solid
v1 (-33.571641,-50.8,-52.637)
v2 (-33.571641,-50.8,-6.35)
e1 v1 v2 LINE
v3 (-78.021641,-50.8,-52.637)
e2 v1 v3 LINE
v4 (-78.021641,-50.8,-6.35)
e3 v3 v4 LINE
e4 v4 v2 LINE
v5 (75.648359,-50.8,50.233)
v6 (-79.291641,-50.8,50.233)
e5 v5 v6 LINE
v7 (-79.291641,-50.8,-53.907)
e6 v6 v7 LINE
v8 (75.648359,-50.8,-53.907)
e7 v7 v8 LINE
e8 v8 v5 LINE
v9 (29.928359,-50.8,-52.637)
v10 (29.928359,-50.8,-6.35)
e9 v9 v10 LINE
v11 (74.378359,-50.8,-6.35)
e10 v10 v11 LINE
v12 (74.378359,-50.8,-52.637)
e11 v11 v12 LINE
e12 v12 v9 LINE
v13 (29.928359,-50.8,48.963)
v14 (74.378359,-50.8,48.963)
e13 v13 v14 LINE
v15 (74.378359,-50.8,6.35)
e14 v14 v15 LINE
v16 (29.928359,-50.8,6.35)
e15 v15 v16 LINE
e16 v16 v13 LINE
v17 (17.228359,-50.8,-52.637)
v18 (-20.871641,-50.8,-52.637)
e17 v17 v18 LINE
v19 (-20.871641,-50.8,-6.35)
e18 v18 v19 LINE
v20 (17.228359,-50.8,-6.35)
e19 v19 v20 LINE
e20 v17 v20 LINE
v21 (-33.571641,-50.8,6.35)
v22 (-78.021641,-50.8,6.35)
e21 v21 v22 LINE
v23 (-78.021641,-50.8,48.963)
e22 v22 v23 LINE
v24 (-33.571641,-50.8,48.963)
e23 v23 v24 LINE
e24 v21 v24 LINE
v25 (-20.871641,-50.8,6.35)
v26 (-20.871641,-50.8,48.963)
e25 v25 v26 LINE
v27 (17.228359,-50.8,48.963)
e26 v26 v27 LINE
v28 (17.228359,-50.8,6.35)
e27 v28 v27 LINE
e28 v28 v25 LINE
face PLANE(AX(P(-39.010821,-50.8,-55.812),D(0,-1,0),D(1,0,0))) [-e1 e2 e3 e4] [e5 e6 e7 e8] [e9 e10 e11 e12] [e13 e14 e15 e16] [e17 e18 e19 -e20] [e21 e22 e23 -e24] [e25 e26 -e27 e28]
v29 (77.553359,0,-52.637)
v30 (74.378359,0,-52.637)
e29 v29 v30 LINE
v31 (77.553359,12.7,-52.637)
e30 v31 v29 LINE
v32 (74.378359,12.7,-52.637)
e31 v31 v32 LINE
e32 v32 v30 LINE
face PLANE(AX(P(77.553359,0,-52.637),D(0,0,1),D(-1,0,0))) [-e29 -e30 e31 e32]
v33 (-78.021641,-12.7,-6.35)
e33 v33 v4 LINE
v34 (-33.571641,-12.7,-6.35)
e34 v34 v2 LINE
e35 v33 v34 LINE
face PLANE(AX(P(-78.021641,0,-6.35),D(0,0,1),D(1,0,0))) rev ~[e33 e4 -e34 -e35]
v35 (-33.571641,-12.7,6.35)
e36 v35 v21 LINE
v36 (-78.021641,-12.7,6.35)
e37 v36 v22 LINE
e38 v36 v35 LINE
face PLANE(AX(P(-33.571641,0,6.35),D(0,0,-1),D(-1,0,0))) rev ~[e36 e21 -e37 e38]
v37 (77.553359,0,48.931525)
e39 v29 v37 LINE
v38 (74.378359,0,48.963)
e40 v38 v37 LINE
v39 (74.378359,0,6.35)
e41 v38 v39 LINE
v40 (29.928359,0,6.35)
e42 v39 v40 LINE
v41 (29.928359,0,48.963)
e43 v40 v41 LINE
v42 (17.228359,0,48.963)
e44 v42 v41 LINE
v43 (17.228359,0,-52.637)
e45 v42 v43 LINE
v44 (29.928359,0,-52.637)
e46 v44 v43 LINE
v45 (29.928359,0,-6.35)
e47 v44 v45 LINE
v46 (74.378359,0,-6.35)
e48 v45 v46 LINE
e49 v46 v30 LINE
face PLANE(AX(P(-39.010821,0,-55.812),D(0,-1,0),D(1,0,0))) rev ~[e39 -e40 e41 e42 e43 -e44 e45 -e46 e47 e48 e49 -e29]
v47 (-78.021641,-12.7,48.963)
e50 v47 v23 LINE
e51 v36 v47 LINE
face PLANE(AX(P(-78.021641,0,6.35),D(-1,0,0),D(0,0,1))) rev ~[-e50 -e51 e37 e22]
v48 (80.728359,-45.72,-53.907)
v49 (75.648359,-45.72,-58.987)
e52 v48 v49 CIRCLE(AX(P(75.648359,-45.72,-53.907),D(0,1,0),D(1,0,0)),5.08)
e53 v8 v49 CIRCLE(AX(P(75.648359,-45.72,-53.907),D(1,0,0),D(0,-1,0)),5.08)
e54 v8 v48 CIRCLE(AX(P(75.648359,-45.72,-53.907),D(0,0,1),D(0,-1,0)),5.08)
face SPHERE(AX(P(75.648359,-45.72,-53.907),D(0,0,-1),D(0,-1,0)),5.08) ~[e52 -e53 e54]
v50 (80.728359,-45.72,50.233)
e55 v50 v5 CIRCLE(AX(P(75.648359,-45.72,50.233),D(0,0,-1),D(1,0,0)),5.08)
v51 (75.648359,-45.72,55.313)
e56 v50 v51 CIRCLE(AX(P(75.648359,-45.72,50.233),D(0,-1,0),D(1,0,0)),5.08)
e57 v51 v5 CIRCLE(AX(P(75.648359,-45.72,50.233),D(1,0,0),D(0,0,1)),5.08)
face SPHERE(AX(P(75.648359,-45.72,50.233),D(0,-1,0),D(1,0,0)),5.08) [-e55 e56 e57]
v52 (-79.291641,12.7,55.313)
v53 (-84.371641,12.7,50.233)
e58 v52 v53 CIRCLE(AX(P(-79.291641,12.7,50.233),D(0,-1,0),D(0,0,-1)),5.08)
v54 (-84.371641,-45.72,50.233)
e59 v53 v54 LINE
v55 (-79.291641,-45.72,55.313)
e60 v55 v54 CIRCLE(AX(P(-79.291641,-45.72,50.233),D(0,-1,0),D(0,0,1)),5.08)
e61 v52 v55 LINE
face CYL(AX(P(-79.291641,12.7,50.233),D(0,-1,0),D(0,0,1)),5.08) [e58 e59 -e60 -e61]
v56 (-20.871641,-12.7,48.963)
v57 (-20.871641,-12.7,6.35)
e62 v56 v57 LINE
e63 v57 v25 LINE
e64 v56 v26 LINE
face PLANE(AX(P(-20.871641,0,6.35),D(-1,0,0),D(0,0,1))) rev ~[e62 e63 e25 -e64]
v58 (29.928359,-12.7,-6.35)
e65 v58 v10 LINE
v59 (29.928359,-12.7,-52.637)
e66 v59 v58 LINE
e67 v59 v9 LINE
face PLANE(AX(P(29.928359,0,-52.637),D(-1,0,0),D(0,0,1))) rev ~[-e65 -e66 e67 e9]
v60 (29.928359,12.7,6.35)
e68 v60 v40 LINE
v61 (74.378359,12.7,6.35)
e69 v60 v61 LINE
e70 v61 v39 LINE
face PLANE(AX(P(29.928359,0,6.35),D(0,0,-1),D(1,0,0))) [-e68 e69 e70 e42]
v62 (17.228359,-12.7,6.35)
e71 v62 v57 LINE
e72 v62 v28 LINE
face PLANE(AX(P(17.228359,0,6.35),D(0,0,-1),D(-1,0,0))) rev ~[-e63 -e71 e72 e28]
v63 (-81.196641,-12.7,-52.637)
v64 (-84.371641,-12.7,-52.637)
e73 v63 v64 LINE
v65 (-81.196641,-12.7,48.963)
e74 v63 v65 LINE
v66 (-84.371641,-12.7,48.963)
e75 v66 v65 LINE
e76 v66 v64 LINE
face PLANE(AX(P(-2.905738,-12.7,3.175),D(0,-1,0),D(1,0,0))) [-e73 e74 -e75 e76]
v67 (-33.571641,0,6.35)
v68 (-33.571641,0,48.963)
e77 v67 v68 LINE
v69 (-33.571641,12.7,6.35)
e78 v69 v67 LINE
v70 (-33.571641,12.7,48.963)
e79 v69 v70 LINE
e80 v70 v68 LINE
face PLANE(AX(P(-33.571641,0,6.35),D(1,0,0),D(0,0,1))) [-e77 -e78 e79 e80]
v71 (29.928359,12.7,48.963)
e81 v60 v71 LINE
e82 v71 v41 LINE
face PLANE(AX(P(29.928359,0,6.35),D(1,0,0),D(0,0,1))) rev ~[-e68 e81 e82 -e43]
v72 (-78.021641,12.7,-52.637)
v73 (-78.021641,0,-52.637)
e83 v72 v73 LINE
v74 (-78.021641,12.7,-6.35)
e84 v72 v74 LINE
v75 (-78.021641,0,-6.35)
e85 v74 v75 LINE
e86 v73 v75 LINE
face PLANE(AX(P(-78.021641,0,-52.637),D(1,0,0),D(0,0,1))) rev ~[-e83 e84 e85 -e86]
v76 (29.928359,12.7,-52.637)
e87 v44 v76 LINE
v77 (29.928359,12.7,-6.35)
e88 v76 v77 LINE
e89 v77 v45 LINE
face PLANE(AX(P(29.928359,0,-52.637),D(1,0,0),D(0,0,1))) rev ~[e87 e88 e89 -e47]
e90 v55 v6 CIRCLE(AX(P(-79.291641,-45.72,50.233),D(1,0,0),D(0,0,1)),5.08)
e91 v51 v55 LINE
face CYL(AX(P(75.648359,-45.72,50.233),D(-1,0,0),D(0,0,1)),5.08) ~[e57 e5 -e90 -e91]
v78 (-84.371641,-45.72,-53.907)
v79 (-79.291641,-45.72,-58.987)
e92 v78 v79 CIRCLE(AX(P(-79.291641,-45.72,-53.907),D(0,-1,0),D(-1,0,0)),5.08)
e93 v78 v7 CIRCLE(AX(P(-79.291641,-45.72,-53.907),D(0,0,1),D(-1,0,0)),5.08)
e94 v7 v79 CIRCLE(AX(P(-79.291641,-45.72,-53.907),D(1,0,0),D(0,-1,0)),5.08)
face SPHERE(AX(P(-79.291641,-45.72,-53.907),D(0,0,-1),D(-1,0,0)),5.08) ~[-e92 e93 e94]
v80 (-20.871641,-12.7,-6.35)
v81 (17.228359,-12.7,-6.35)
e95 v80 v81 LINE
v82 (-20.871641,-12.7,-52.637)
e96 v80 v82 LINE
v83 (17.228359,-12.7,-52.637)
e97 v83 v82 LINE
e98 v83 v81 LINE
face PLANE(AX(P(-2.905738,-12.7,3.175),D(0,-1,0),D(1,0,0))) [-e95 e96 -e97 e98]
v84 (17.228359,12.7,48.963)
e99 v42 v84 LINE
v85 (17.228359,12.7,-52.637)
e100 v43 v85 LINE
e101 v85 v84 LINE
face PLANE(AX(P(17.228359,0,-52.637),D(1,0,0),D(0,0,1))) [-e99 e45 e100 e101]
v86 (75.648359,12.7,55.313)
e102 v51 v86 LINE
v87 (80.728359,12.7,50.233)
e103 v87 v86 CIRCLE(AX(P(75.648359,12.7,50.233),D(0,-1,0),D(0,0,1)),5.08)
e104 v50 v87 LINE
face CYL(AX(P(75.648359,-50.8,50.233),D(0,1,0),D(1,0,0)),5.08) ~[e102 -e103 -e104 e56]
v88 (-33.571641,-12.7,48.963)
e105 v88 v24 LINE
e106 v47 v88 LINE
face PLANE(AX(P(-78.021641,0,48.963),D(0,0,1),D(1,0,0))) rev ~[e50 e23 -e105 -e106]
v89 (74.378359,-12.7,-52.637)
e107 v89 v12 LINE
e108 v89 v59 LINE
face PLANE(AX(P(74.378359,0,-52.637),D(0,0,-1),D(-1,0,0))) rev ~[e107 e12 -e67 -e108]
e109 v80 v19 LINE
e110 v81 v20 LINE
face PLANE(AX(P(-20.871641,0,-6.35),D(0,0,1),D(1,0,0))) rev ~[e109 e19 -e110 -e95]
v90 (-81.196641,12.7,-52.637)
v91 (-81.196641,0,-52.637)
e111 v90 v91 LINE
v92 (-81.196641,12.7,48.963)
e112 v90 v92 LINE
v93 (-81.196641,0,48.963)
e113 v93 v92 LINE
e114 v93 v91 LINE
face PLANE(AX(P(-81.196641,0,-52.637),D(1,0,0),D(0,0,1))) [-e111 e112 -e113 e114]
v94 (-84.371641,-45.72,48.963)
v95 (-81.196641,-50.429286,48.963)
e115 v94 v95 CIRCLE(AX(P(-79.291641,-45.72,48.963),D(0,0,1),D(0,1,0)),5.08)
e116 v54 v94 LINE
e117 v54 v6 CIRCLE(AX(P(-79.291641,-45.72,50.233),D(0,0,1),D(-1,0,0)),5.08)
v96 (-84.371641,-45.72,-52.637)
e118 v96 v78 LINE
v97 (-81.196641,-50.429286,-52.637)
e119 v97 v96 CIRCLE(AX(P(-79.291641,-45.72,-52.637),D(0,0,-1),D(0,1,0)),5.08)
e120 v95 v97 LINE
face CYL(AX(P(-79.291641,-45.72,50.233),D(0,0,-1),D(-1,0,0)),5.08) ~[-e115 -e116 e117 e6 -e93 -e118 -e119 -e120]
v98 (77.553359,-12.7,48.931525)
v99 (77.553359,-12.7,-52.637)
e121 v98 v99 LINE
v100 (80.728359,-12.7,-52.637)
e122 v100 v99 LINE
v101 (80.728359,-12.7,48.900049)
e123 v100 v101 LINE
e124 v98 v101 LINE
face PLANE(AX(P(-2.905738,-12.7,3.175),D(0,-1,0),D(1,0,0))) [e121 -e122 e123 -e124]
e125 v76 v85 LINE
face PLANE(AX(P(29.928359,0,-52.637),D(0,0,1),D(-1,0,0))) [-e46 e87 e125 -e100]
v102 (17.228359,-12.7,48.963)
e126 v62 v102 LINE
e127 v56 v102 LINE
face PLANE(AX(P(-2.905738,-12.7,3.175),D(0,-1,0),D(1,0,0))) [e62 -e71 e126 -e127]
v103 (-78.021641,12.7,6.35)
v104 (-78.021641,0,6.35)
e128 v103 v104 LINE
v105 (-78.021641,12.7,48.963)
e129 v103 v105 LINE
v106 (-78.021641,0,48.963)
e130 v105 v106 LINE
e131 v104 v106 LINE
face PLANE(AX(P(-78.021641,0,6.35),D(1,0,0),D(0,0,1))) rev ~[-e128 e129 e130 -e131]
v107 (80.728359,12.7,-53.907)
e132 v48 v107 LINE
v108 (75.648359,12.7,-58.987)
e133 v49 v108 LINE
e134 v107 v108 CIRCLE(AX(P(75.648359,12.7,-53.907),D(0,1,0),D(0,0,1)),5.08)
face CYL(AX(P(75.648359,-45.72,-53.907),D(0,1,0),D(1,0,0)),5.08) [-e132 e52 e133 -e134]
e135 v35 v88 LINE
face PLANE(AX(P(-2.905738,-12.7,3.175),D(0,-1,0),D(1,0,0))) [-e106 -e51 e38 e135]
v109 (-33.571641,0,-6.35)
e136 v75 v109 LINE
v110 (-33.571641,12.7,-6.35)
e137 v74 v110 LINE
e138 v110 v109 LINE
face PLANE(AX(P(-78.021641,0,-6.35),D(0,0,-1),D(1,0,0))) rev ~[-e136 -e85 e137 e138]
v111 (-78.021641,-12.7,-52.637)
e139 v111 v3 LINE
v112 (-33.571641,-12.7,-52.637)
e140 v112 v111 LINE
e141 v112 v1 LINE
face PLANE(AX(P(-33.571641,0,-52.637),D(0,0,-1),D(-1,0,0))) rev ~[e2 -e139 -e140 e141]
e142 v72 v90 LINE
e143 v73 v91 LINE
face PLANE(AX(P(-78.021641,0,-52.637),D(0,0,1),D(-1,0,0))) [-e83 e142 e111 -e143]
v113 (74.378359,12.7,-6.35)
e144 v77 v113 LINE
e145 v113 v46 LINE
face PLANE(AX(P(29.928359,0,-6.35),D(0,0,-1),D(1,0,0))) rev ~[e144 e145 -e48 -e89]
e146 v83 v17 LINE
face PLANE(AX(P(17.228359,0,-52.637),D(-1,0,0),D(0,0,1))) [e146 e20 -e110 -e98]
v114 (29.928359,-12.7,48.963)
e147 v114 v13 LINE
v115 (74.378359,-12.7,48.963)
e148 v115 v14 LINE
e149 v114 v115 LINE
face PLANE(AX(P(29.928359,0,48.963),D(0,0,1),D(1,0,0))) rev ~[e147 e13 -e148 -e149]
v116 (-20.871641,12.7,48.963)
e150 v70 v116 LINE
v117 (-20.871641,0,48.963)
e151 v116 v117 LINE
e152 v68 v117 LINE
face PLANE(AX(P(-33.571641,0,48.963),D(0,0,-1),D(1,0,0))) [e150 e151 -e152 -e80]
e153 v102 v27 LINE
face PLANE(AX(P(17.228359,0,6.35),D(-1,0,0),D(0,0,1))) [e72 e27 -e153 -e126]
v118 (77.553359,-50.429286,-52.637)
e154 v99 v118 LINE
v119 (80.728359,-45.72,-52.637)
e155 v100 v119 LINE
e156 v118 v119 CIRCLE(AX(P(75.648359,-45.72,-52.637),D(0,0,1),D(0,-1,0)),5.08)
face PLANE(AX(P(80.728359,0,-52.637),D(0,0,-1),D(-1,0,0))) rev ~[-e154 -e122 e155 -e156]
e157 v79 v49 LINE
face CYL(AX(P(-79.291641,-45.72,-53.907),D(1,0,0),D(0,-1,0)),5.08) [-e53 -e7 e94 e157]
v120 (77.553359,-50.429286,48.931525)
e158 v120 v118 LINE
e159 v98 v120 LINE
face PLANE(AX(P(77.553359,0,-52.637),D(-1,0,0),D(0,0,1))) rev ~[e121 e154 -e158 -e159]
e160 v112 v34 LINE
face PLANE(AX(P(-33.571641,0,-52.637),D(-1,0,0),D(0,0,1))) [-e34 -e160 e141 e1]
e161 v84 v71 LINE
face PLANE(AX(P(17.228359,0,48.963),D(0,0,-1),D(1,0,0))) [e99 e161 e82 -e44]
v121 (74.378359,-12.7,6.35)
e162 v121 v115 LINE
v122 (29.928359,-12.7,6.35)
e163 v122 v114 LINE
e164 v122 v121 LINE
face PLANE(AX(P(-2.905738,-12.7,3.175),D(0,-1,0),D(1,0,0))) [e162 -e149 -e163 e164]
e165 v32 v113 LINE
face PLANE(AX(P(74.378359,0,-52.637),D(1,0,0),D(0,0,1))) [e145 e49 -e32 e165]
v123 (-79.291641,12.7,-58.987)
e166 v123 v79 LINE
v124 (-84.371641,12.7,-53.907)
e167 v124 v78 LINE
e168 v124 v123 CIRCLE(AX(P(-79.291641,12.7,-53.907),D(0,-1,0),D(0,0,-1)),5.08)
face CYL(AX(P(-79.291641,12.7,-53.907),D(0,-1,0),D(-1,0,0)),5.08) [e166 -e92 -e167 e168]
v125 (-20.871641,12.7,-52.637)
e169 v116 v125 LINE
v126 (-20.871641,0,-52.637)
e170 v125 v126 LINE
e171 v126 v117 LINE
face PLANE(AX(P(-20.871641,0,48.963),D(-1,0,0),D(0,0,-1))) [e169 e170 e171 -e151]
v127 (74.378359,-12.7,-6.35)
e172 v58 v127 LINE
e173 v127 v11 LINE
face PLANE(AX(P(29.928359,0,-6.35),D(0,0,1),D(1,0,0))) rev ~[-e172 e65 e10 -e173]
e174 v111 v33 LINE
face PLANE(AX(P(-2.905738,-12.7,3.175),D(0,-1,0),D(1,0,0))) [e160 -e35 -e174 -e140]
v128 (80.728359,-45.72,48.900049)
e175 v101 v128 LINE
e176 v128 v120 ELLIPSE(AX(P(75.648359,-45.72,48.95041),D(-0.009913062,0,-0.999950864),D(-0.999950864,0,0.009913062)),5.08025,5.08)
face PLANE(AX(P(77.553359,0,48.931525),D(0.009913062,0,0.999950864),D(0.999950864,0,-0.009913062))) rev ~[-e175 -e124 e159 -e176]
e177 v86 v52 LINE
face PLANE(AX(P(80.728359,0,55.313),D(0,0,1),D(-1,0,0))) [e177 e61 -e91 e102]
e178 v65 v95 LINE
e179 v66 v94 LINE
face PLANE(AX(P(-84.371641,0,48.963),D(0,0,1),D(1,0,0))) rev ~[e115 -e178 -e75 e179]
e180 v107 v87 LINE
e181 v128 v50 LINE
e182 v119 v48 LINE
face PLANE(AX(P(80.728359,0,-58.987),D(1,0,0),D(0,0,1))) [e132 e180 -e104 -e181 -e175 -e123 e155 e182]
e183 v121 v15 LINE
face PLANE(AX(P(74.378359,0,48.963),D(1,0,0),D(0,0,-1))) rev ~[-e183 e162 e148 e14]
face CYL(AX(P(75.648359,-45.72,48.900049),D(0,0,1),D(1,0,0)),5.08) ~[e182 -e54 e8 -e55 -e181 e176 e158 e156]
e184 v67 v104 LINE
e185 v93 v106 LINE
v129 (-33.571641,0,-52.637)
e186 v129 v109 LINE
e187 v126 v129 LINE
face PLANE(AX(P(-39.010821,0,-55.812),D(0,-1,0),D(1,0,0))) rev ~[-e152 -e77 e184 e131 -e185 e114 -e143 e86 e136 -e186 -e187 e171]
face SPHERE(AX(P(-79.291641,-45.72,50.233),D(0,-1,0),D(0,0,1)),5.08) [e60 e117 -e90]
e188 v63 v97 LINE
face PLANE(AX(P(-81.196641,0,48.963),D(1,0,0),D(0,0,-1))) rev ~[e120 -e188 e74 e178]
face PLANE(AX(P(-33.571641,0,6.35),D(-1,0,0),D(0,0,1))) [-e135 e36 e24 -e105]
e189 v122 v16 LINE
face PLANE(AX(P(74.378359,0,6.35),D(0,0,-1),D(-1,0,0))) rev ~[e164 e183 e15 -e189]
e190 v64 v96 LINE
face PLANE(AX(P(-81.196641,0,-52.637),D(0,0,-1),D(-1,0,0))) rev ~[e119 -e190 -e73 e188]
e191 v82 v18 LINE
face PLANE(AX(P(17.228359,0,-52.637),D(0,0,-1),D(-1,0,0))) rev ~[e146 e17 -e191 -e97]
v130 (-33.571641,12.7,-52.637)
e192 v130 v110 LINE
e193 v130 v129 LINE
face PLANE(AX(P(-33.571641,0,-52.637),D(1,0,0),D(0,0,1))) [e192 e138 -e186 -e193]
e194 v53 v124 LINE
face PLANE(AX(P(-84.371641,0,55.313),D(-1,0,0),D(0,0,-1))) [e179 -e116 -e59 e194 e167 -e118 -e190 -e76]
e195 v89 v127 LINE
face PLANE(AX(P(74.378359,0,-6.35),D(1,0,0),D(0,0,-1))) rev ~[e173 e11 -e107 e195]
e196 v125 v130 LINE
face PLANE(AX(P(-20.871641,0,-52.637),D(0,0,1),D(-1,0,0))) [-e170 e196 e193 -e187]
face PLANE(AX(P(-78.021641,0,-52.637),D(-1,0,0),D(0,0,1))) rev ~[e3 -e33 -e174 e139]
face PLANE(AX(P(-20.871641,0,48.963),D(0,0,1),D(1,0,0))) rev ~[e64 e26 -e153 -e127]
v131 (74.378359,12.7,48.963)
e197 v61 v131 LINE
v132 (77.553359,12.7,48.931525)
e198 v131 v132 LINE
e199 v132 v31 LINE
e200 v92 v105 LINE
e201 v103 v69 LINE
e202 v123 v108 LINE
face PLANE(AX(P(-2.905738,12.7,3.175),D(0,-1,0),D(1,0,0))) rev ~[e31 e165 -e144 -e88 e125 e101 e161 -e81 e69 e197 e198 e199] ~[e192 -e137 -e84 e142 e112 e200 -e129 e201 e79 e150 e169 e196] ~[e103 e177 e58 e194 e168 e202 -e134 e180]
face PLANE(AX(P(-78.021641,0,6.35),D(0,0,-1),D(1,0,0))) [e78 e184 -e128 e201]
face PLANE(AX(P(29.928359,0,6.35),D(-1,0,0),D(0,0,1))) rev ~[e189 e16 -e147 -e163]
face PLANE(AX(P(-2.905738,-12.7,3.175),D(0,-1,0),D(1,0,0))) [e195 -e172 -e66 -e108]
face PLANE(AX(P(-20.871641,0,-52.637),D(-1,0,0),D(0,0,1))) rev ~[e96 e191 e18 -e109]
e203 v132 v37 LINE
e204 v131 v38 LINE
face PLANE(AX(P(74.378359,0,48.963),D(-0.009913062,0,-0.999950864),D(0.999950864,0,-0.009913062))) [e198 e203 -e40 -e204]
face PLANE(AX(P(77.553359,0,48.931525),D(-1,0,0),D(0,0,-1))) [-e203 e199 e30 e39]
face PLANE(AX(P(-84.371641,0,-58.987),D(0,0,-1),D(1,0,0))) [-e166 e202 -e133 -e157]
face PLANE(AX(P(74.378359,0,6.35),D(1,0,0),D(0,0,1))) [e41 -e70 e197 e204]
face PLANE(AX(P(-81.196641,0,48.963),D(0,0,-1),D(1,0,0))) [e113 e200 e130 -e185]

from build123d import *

# Parameters (mm, degrees)
F0_W     = 3.175
F0_H     = 6.35
F0_W_2   = 6.35
F0_W_3   = 44.45
F0_W_4   = 15.0601655953
F0_W_5   = 5.811475683
F0_W_6   = 6.888524317
F0_W_7   = 10.3398344047
F0_H_2   = 42.6130002154
F0_H_3   = 46.2869997846
F1_DEPTH = 50.8
F0_H_4   = 52.6369997846
F0_H_5   = 48.9630002154
F2_DEPTH = 12.7
F3_F1_R  = 5.08
F3_F2_R  = 5.08
F3_F3_R  = 5.08
F3_F4_R  = 5.08


with BuildPart() as f1:
    # F0 (on Front) → F1 (new body)
    with BuildSketch(Plane.XZ):
        Polygon((0, -58.9869997846), (0, -52.6369997846), (-5.811475683, -52.6369997846), (-20.8716412783, -52.6369997846), (-27.2216412783, -52.6369997846), (-33.5716412783, -52.6369997846), (-78.0216412783, -52.6369997846), (-78.0216412783, -58.9869997846), align=None)
        with Locations((-79.6091412783, 52.1380002154)):
            Rectangle(F0_W, F0_H)
        with Locations((-82.7841412783, 52.1380002154)):
            Rectangle(F0_W, F0_H)
        Polygon((-5.811475683, 48.9630002154), (0, 48.9630002154), (0, 55.3130002154), (-78.0216412783, 55.3130002154), (-78.0216412783, 48.9630002154), (-33.5716412783, 48.9630002154), (-27.2216412783, 48.9630002154), (-20.8716412783, 48.9630002154), align=None)
        Polygon((0, 55.3130002154), (0, 48.9630002154), (6.888524317, 48.9630002154), (17.2283587217, 48.9630002154), (23.5783587217, 48.9630002154), (29.9283587217, 48.9630002154), (74.3783587217, 48.9630002154), (74.3783587217, 55.3130002154), align=None)
        Polygon((80.7283587217, 55.3130002154), (77.5533587217, 55.3130002154), (77.5533587217, 48.9315246976), (80.7283587217, 48.9000491798), align=None)
        Polygon((77.5533587217, 55.3130002154), (74.3783587217, 55.3130002154), (74.3783587217, 48.9630002154), (77.5533587217, 48.9315246976), align=None)
        Polygon((6.888524317, -52.6369997846), (0, -52.6369997846), (0, -58.9869997846), (80.7283587217, -58.9869997846), (80.7283587217, -52.6369997846), (77.5533587217, -52.6369997846), (74.3783587217, -52.6369997846), (29.9283587217, -52.6369997846), (23.5783587217, -52.6369997846), (17.2283587217, -52.6369997846), align=None)
        with Locations((-82.7841412783, -55.8119997846)):
            Rectangle(F0_W, F0_H)
        with Locations((-79.6091412783, -55.8119997846)):
            Rectangle(F0_W, F0_H)
        with Locations((-30.3966412783, 3.175)):
            Rectangle(F0_W_2, F0_H)
        with Locations((-24.0466412783, 3.175)):
            Rectangle(F0_W_2, F0_H)
        with Locations((-30.3966412783, -3.175)):
            Rectangle(F0_W_2, F0_H)
        with Locations((-24.0466412783, -3.175)):
            Rectangle(F0_W_2, F0_H)
        with Locations((20.4033587217, -3.175)):
            Rectangle(F0_W_2, F0_H)
        with Locations((20.4033587217, 3.175)):
            Rectangle(F0_W_2, F0_H)
        with Locations((26.7533587217, 3.175)):
            Rectangle(F0_W_2, F0_H)
        with Locations((26.7533587217, -3.175)):
            Rectangle(F0_W_2, F0_H)
        with Locations((-55.7966412783, 3.175)):
            Rectangle(F0_W_3, F0_H)
        with Locations((-55.7966412783, -3.175)):
            Rectangle(F0_W_3, F0_H)
        with Locations((-13.3415584806, 3.175)):
            Rectangle(F0_W_4, F0_H)
        with Locations((-13.3415584806, -3.175)):
            Rectangle(F0_W_4, F0_H)
        with Locations((-2.9057378415, 3.175)):
            Rectangle(F0_W_5, F0_H)
        with Locations((-2.9057378415, -3.175)):
            Rectangle(F0_W_5, F0_H)
        with Locations((3.4442621585, -3.175)):
            Rectangle(F0_W_6, F0_H)
        with Locations((3.4442621585, 3.175)):
            Rectangle(F0_W_6, F0_H)
        with Locations((12.0584415194, -3.175)):
            Rectangle(F0_W_7, F0_H)
        with Locations((12.0584415194, 3.175)):
            Rectangle(F0_W_7, F0_H)
        with Locations((52.1533587217, 3.175)):
            Rectangle(F0_W_3, F0_H)
        with Locations((52.1533587217, -3.175)):
            Rectangle(F0_W_3, F0_H)
        with Locations((-30.3966412783, 27.6565001077)):
            Rectangle(F0_W_2, F0_H_2)
        with Locations((-24.0466412783, 27.6565001077)):
            Rectangle(F0_W_2, F0_H_2)
        with Locations((-30.3966412783, -29.4934998923)):
            Rectangle(F0_W_2, F0_H_3)
        with Locations((-24.0466412783, -29.4934998923)):
            Rectangle(F0_W_2, F0_H_3)
        with Locations((20.4033587217, 27.6565001077)):
            Rectangle(F0_W_2, F0_H_2)
        with Locations((26.7533587217, 27.6565001077)):
            Rectangle(F0_W_2, F0_H_2)
        with Locations((20.4033587217, -29.4934998923)):
            Rectangle(F0_W_2, F0_H_3)
        with Locations((26.7533587217, -29.4934998923)):
            Rectangle(F0_W_2, F0_H_3)
        Polygon((77.5533587217, 48.9315246976), (74.3783587217, 48.9630002154), (74.3783587217, 6.35), (74.3783587217, 0), (77.5533587217, 0), align=None)
        Polygon((77.5533587217, 0), (74.3783587217, 0), (74.3783587217, -6.35), (74.3783587217, -52.6369997846), (77.5533587217, -52.6369997846), align=None)
        Polygon((-78.0216412783, 6.35), (-78.0216412783, 48.9630002154), (-81.1966412783, 48.9630002154), (-81.1966412783, 0), (-78.0216412783, 0), align=None)
        Polygon((-81.1966412783, -52.6369997846), (-78.0216412783, -52.6369997846), (-78.0216412783, -6.35), (-78.0216412783, 0), (-81.1966412783, 0), align=None)
    extrude(amount=F1_DEPTH)

    # F0 (on Front) → F2 (join, symmetric)
    with BuildSketch(Plane.XZ):
        with Locations((-2.9057378415, 3.175)):
            Rectangle(F0_W_5, F0_H)
        with Locations((3.4442621585, -3.175)):
            Rectangle(F0_W_6, F0_H)
        with Locations((-2.9057378415, -3.175)):
            Rectangle(F0_W_5, F0_H)
        with Locations((3.4442621585, 3.175)):
            Rectangle(F0_W_6, F0_H)
        with Locations((-2.9057378415, 27.6565001077)):
            Rectangle(F0_W_5, F0_H_2)
        with Locations((3.4442621585, 27.6565001077)):
            Rectangle(F0_W_6, F0_H_2)
        with Locations((3.4442621585, -29.4934998923)):
            Rectangle(F0_W_6, F0_H_3)
        with Locations((-2.9057378415, -29.4934998923)):
            Rectangle(F0_W_5, F0_H_3)
        with Locations((-13.3415584806, -3.175)):
            Rectangle(F0_W_4, F0_H)
        with Locations((-13.3415584806, 3.175)):
            Rectangle(F0_W_4, F0_H)
        with Locations((12.0584415194, 3.175)):
            Rectangle(F0_W_7, F0_H)
        with Locations((12.0584415194, -3.175)):
            Rectangle(F0_W_7, F0_H)
        Polygon((0, 55.3130002154), (0, 48.9630002154), (6.888524317, 48.9630002154), (17.2283587217, 48.9630002154), (23.5783587217, 48.9630002154), (29.9283587217, 48.9630002154), (74.3783587217, 48.9630002154), (74.3783587217, 55.3130002154), align=None)
        Polygon((-5.811475683, 48.9630002154), (0, 48.9630002154), (0, 55.3130002154), (-78.0216412783, 55.3130002154), (-78.0216412783, 48.9630002154), (-33.5716412783, 48.9630002154), (-27.2216412783, 48.9630002154), (-20.8716412783, 48.9630002154), align=None)
        with Locations((12.0584415194, 27.6565001077)):
            Rectangle(F0_W_7, F0_H_2)
        with Locations((-13.3415584806, 27.6565001077)):
            Rectangle(F0_W_4, F0_H_2)
        Polygon((0, -58.9869997846), (0, -52.6369997846), (-5.811475683, -52.6369997846), (-20.8716412783, -52.6369997846), (-27.2216412783, -52.6369997846), (-33.5716412783, -52.6369997846), (-78.0216412783, -52.6369997846), (-78.0216412783, -58.9869997846), align=None)
        Polygon((6.888524317, -52.6369997846), (0, -52.6369997846), (0, -58.9869997846), (80.7283587217, -58.9869997846), (80.7283587217, -52.6369997846), (77.5533587217, -52.6369997846), (74.3783587217, -52.6369997846), (29.9283587217, -52.6369997846), (23.5783587217, -52.6369997846), (17.2283587217, -52.6369997846), align=None)
        with Locations((12.0584415194, -29.4934998923)):
            Rectangle(F0_W_7, F0_H_3)
        with Locations((-13.3415584806, -29.4934998923)):
            Rectangle(F0_W_4, F0_H_3)
        with Locations((-79.6091412783, 52.1380002154)):
            Rectangle(F0_W, F0_H)
        Polygon((77.5533587217, 55.3130002154), (74.3783587217, 55.3130002154), (74.3783587217, 48.9630002154), (77.5533587217, 48.9315246976), align=None)
        with Locations((-79.6091412783, -55.8119997846)):
            Rectangle(F0_W, F0_H)
        with Locations((-55.7966412783, 27.6565001077)):
            Rectangle(F0_W_3, F0_H_2)
        with Locations((-82.7841412783, 52.1380002154)):
            Rectangle(F0_W, F0_H)
        with Locations((52.1533587217, 27.6565001077)):
            Rectangle(F0_W_3, F0_H_2)
        Polygon((80.7283587217, 55.3130002154), (77.5533587217, 55.3130002154), (77.5533587217, 48.9315246976), (80.7283587217, 48.9000491798), align=None)
        with Locations((79.1408587217, -26.3184998923)):
            Rectangle(F0_W, F0_H_4)
        with Locations((-55.7966412783, -29.4934998923)):
            Rectangle(F0_W_3, F0_H_3)
        with Locations((-82.7841412783, -55.8119997846)):
            Rectangle(F0_W, F0_H)
        with Locations((52.1533587217, -29.4934998923)):
            Rectangle(F0_W_3, F0_H_3)
        with Locations((-82.7841412783, 24.4815001077)):
            Rectangle(F0_W, F0_H_5)
        Polygon((80.7283587217, 48.9000491798), (77.5533587217, 48.9315246976), (77.5533587217, 0), (80.7283587217, 0), align=None)
        with Locations((-82.7841412783, -26.3184998923)):
            Rectangle(F0_W, F0_H_4)
    extrude(amount=F2_DEPTH, both=True)

    # F3: fillet of radius 5.08 on 10 edges, made by hand

    # F3_f1
    f3_f1_edges = [f1.edges().sort_by_distance(p)[0] for p in [
        (80.7283587217, -19.05, 55.3130002154),
    ]]
    fillet(f3_f1_edges, radius=F3_F1_R)

    # F3_f2
    f3_f2_edges = [f1.edges().sort_by_distance(p)[0] for p in [
        (-84.3716412783, -19.05, 55.3130002154),
    ]]
    fillet(f3_f2_edges, radius=F3_F2_R)

    # F3_f3
    f3_f3_edges = [f1.edges().sort_by_distance(p)[0] for p in [
        (-1.8216412783, -50.8, 55.3130002154),
    ]]
    fillet(f3_f3_edges, radius=F3_F3_R)

    # F3_f4
    f3_f4_edges = [f1.edges().sort_by_distance(p)[0] for p in [
        (-1.8216412783, -50.8, -58.9869997846),
    ]]
    fillet(f3_f4_edges, radius=F3_F4_R)


solid = f1.part
